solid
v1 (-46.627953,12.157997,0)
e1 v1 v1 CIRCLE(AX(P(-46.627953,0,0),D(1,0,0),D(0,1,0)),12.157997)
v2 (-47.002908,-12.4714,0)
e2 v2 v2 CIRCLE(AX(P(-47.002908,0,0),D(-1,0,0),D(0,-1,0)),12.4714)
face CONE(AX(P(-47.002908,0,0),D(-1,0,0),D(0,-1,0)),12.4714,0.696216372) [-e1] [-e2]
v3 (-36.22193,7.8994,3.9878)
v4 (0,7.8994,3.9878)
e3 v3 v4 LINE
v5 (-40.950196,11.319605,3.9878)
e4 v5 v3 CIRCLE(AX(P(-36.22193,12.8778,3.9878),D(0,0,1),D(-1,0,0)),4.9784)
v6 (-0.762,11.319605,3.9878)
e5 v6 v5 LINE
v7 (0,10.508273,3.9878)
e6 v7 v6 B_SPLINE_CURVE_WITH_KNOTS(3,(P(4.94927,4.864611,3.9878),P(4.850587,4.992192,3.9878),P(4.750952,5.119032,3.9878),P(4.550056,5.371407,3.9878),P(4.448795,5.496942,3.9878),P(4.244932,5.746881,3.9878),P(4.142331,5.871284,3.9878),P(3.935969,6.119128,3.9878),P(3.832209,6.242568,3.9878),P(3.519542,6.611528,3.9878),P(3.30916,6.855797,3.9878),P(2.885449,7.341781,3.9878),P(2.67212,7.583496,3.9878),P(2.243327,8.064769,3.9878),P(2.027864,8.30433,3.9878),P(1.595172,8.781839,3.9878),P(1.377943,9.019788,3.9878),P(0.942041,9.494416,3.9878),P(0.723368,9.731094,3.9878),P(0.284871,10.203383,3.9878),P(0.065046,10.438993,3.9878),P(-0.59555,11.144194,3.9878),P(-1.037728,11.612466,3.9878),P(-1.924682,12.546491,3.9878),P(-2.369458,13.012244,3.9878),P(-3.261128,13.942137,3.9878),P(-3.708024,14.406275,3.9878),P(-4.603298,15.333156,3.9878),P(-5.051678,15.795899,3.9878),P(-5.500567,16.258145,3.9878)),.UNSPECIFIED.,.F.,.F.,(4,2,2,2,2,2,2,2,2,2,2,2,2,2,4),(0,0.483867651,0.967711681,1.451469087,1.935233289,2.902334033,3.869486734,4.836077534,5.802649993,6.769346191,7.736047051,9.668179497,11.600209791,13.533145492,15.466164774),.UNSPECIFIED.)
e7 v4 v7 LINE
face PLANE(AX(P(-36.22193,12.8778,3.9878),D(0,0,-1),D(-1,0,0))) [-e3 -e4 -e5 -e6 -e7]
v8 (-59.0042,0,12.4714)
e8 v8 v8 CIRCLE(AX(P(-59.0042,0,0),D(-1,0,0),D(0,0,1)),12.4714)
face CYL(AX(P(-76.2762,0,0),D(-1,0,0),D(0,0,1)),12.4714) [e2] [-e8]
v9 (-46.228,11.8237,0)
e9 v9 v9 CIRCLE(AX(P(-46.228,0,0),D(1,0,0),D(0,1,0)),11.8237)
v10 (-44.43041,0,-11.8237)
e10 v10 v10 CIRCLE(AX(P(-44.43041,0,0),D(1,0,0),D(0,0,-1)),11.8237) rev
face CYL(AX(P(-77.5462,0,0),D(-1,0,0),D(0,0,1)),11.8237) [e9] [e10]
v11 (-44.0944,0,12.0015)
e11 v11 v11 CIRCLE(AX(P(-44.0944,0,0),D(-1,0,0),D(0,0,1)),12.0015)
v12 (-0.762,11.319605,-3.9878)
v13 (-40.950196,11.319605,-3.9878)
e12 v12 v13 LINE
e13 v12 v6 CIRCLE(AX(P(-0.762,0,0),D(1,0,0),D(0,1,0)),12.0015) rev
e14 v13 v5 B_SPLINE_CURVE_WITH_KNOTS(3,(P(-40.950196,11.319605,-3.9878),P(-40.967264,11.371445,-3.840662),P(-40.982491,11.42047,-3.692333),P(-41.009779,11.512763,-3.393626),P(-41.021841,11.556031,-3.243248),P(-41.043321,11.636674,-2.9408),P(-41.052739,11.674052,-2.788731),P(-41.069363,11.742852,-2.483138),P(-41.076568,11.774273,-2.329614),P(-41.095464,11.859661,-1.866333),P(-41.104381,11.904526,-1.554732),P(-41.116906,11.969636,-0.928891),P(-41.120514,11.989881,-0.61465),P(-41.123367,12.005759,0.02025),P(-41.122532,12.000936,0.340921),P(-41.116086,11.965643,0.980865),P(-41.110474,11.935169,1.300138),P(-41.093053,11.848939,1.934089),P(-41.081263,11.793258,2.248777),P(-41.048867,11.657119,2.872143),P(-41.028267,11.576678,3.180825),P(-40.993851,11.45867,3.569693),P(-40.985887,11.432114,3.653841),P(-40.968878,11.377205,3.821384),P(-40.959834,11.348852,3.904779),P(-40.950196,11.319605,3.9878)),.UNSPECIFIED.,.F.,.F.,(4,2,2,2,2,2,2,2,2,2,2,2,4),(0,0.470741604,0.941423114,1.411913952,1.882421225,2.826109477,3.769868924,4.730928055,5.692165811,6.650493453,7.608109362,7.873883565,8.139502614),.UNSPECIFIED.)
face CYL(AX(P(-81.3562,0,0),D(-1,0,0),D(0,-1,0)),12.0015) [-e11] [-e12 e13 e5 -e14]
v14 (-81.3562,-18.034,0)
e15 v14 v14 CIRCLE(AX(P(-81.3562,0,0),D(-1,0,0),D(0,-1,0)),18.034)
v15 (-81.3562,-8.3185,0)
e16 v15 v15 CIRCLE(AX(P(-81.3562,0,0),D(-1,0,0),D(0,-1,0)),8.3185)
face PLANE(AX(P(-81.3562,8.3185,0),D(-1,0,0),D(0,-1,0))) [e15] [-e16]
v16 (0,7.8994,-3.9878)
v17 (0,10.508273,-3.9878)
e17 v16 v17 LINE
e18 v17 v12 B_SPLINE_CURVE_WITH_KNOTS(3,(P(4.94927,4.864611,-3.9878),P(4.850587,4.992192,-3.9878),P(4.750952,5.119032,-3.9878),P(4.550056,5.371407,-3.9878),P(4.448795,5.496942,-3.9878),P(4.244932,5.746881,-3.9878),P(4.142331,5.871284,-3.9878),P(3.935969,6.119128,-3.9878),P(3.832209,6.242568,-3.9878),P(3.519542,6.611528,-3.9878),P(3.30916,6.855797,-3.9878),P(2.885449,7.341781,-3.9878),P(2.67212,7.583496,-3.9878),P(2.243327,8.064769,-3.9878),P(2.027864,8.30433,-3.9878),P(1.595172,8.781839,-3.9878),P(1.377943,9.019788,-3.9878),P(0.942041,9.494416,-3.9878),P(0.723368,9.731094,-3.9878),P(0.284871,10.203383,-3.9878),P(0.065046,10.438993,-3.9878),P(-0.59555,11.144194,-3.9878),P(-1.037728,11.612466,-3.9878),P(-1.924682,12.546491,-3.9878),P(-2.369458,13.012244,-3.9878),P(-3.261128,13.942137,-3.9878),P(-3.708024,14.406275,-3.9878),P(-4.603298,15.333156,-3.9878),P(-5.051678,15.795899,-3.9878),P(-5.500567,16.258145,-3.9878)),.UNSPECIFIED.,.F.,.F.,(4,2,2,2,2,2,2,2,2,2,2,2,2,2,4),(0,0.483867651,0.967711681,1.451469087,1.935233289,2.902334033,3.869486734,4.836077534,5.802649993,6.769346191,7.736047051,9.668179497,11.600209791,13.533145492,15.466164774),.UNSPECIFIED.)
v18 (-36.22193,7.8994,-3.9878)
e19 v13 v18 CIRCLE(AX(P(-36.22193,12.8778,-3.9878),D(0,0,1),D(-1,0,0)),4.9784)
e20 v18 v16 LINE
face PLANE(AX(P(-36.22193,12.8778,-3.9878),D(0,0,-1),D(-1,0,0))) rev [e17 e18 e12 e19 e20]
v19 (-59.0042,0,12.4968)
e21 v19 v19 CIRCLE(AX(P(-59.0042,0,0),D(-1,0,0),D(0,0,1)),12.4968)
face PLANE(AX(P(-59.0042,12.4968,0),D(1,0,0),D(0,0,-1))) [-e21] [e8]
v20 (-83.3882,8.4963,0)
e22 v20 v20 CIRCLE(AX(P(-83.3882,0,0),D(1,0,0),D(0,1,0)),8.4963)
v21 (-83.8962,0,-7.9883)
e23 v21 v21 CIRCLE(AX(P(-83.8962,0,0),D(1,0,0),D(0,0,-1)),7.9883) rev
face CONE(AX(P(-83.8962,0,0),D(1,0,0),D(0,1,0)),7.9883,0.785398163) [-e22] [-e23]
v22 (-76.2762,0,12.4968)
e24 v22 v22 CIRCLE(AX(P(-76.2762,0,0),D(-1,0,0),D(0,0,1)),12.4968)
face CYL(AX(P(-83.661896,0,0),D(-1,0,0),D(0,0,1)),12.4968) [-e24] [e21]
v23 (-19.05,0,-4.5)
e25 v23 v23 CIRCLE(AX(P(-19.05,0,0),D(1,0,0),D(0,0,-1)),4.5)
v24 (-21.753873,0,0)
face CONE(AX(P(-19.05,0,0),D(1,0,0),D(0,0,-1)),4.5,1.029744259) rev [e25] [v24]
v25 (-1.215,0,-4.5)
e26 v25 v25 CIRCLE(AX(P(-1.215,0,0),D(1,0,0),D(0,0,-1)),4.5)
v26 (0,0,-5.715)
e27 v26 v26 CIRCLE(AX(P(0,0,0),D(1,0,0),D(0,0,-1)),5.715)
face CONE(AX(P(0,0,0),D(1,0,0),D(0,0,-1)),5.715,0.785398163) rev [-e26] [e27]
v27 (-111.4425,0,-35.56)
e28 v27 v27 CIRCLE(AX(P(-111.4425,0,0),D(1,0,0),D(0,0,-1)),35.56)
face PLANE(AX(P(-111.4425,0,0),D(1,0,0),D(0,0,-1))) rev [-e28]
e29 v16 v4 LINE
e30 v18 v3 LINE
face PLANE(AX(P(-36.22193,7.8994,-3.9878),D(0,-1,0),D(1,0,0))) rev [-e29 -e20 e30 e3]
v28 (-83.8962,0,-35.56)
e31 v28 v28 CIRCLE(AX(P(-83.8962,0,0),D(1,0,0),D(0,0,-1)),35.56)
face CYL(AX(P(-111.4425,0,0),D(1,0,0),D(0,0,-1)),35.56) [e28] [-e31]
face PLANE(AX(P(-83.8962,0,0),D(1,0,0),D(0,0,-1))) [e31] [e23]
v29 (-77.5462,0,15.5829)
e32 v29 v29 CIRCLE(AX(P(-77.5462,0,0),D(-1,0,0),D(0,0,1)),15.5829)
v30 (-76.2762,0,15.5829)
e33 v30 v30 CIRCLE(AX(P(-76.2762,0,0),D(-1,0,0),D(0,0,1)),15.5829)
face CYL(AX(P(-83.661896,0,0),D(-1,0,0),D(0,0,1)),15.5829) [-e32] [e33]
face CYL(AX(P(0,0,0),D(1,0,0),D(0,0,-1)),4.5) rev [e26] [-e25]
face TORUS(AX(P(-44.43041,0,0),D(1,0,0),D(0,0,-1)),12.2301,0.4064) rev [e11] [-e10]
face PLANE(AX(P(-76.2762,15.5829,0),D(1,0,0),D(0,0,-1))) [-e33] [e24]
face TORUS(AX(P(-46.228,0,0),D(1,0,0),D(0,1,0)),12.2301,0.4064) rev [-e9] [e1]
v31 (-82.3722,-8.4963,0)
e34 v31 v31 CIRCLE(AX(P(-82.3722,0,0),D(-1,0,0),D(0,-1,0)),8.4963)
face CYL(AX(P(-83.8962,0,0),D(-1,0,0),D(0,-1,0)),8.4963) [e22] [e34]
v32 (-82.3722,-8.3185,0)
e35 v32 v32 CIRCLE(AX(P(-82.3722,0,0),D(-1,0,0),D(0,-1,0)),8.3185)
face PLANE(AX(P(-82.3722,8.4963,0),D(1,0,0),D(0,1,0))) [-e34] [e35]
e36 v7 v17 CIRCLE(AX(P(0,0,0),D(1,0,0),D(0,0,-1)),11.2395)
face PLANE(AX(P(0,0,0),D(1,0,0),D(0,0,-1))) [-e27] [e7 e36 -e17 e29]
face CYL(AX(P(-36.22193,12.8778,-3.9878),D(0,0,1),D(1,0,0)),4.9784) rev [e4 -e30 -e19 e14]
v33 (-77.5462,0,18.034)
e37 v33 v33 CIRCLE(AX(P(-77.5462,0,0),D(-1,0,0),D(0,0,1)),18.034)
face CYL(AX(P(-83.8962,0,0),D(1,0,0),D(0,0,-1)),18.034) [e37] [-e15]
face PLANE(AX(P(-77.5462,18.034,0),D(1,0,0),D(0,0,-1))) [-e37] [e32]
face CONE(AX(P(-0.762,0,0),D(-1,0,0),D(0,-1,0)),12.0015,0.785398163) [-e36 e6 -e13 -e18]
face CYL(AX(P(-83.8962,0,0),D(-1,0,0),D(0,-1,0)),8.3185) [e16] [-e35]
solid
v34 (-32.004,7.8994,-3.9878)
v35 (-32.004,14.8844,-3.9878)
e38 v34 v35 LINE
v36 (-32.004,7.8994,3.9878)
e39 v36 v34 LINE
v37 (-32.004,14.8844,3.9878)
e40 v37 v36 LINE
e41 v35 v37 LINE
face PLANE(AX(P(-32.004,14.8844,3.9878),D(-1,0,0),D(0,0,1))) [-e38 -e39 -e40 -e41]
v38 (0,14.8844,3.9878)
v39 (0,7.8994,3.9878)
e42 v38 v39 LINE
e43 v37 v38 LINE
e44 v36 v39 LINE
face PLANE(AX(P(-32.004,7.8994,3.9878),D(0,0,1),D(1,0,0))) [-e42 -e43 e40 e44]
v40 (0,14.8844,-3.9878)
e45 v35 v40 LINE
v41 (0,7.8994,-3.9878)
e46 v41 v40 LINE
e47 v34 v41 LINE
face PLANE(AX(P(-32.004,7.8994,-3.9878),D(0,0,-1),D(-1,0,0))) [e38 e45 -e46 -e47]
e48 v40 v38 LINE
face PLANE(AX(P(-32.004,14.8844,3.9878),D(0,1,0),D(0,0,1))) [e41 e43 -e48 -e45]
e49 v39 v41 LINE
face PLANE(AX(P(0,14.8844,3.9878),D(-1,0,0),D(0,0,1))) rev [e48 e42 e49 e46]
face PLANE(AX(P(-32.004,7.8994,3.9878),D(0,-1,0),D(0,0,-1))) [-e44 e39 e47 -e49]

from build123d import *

# Parameters (mm, degrees)
SKETCH2_R                                           = 18.034
EXTRUDE1_DEPTH                                      = 83.8962
SKETCH5_W                                           = 59.0042
SKETCH5_H                                           = 0.0254
SKETCH12_W                                          = 46.6344
SKETCH12_H                                          = 0.4699
SKETCH13_W                                          = 2.54
SKETCH13_H                                          = 0.1778
CSK_FOR_M8_COUNTERSUNK_FLAT_HEAD_SCREW1_D           = 9
CSK_FOR_M8_COUNTERSUNK_FLAT_HEAD_SCREW1_DEPTH       = 19.05
CSK_FOR_M8_COUNTERSUNK_FLAT_HEAD_SCREW1_CSINK_D     = 11.43
CSK_FOR_M8_COUNTERSUNK_FLAT_HEAD_SCREW1_CSINK_ANGLE = 90
CSK_FOR_M8_COUNTERSUNK_FLAT_HEAD_SCREW1_TIP         = 2.703872786
CHAMFER3_SIZE                                       = 0.762
FILLET1_R                                           = 0.4064
EXTRUDE2_DEPTH                                      = 3.9878
SKETCH9_W                                           = 7.9756
SKETCH9_H                                           = 6.985
EXTRUDE3_DEPTH                                      = 32.004
CHAMFER1_SIZE                                       = 0.508
SKETCH10_R                                          = 35.56
EXTRUDE4_DEPTH                                      = 27.5463


with BuildPart() as part:
    # Sketch2 → Extrude1 (new body)
    with BuildSketch(Plane(origin=(0, 0, 0), x_dir=(0, 0, -1), z_dir=(1, 0, 0))):
        Circle(SKETCH2_R)
    extrude(amount=-EXTRUDE1_DEPTH)

    # Sketch3 → Cut-Revolve1 (revolve, cut)
    with BuildSketch(Plane.XY, mode=Mode.PRIVATE) as cut_revolve1_sk:
        Polygon((-83.8962, 8.4963), (-82.3722, 8.4963), (-82.3722, 8.3185), (-81.3562, 8.3185), (-81.3562, 18.034), (-83.8962, 18.034), align=None)
    revolve(cut_revolve1_sk.sketch.rotate(Axis((-83.8962, 0, 0), (1, 0, 0)), 180), axis=Axis((-83.8962, 0, 0), (1, 0, 0)), mode=Mode.SUBTRACT)

    # Sketch4 → Cut-Revolve2 (revolve, cut)
    with BuildSketch(Plane.XY, mode=Mode.PRIVATE) as cut_revolve2_sk:
        Polygon((-77.5462, 18.034), (-77.5462, 15.5829), (-76.2762, 15.5829), (-76.2762, 12.4968), (0, 12.4968), (0, 18.034), align=None)
    revolve(cut_revolve2_sk.sketch.rotate(Axis((-83.661895901, 0, 0), (1, 0, 0)), 90), axis=Axis((-83.661895901, 0, 0), (1, 0, 0)), mode=Mode.SUBTRACT)

    # Sketch5 → Cut-Revolve3 (revolve, cut)
    with BuildSketch(Plane.XY, mode=Mode.PRIVATE) as cut_revolve3_sk:
        with Locations((-29.5021, 12.4841)):
            Rectangle(SKETCH5_W, SKETCH5_H)
    revolve(cut_revolve3_sk.sketch.rotate(Axis((-76.2762, 0, 0), (1, 0, 0)), 90), axis=Axis((-76.2762, 0, 0), (1, 0, 0)), mode=Mode.SUBTRACT)

    # Sketch12 → Cut-Revolve4 (revolve, cut)
    with BuildSketch(Plane.XY, mode=Mode.PRIVATE) as cut_revolve4_sk:
        with Locations((-23.3172, 12.23645)):
            Rectangle(SKETCH12_W, SKETCH12_H)
    revolve(cut_revolve4_sk.sketch.rotate(Axis((-81.3562, 0, 0), (1, 0, 0)), 180), axis=Axis((-81.3562, 0, 0), (1, 0, 0)), mode=Mode.SUBTRACT)

    # Sketch13 → Cut-Revolve5 (revolve, cut)
    with BuildSketch(Plane.XY, mode=Mode.PRIVATE) as cut_revolve5_sk:
        with Locations((-45.3644, 11.9126)):
            Rectangle(SKETCH13_W, SKETCH13_H)
    revolve(cut_revolve5_sk.sketch.rotate(Axis((-77.5462, 0, 0), (1, 0, 0)), 180), axis=Axis((-77.5462, 0, 0), (1, 0, 0)), mode=Mode.SUBTRACT)

    # CSK for M8 Countersunk Flat Head Screw1
    with Locations(Plane(origin=(0, 0, 0), x_dir=(0, 0, 1), z_dir=(1, 0, 0))):
        with Locations((0, 0)):
            CounterSinkHole(CSK_FOR_M8_COUNTERSUNK_FLAT_HEAD_SCREW1_D / 2, CSK_FOR_M8_COUNTERSUNK_FLAT_HEAD_SCREW1_CSINK_D / 2, depth=CSK_FOR_M8_COUNTERSUNK_FLAT_HEAD_SCREW1_DEPTH, counter_sink_angle=CSK_FOR_M8_COUNTERSUNK_FLAT_HEAD_SCREW1_CSINK_ANGLE)
            with Locations((0, 0, -(CSK_FOR_M8_COUNTERSUNK_FLAT_HEAD_SCREW1_DEPTH + CSK_FOR_M8_COUNTERSUNK_FLAT_HEAD_SCREW1_TIP / 2))):  # 118° drill point
                Cone(0, CSK_FOR_M8_COUNTERSUNK_FLAT_HEAD_SCREW1_D / 2, CSK_FOR_M8_COUNTERSUNK_FLAT_HEAD_SCREW1_TIP, mode=Mode.SUBTRACT)

    # Chamfer3
    chamfer3_edges = [part.edges().sort_by_distance(p)[0] for p in [
        (0, 12.0015, 0),
    ]]
    chamfer(chamfer3_edges, length=CHAMFER3_SIZE)

    # Fillet1
    # the kernel refuses this fillet: 0.4064 mm, written as the material it adds along each edge
    with BuildSketch(Plane(origin=(-46.6344, 0, 0), x_dir=(0, -1, 0), z_dir=(0, 0, 1))) as fillet1_piece_1:
        with BuildLine():
            CenterArc((11.8237 + FILLET1_R, FILLET1_R), FILLET1_R, 180, 90)
            Line((11.8237 + FILLET1_R, 0), (11.8237 + FILLET1_R, -FILLET1_R * 0.02))
            Line((11.8237 + FILLET1_R, -FILLET1_R * 0.02), (11.8237 - FILLET1_R * 0.02, -FILLET1_R * 0.02))
            Line((11.8237 - FILLET1_R * 0.02, -FILLET1_R * 0.02), (11.8237 - FILLET1_R * 0.02, FILLET1_R))
            Line((11.8237 - FILLET1_R * 0.02, FILLET1_R), (11.8237, FILLET1_R))
        make_face()
    revolve(axis=Axis((-46.6344, 0, 0), (1, 0, 0)))
    with BuildSketch(Plane(origin=(-44.0944, 0, 0), x_dir=(0, -1, 0), z_dir=(0, 0, 1))) as fillet1_piece_2:
        with BuildLine():
            CenterArc((12.2301, -0.336010417), FILLET1_R, 124.228866328, 55.771133672)
            Line((11.8237, -0.336010417), (11.815572, -0.336010417))
            Line((11.815572, -0.336010417), (11.815572, 0))
            Line((11.815572, 0), (11.8237, 0.008128))
            ThreePointArc((11.8237, 0.008128), (11.9126, 0.008128), (11.996928, 0.006720208))
            Line((11.996928, 0.006720208), (12.0015, 0))
        make_face()
    revolve(axis=Axis((-44.0944, 0, 0), (1, 0, 0)))

    # Sketch8 → Extrude2 (cut, symmetric)
    with BuildSketch(Plane.XY):
        with BuildLine():
            Line((-41.1226, 12.0015), (0, 12.0015))
            Line((0, 12.0015), (0, 7.8994))
            Line((0, 7.8994), (-36.221930161, 7.8994))
            ThreePointArc((-36.221930161, 7.8994), (-39.417387455, 9.060272104), (-41.1226, 12.0015))
        make_face()
    extrude(amount=EXTRUDE2_DEPTH, both=True, mode=Mode.SUBTRACT)

    # Chamfer1
    chamfer1_edges = [part.edges().sort_by_distance(p)[0] for p in [
        (-83.8962, 8.4963, 0),
    ]]
    chamfer(chamfer1_edges, length=CHAMFER1_SIZE)

    # Chamfer2: read off the stored shape, not the designer's step
    # Chamfer2 outline → Chamfer2 (revolve, cut)
    with BuildSketch(Plane.YX):
        Polygon((12.2301, -46.627952603), (12.157996774, -46.627952603), (12.4714, -47.002908169), (12.4714, -46.6344), (12.2301, -46.6344), align=None)
    revolve(axis=Axis((0, 0, 0), (1, 0, 0)), mode=Mode.SUBTRACT)

    # Sketch10 → Extrude4 (add)
    with BuildSketch(Plane(origin=(-83.8962, 0, 0), x_dir=(0, 0, -1), z_dir=(1, 0, 0))):
        Circle(SKETCH10_R)
    extrude(amount=-EXTRUDE4_DEPTH)


with BuildPart() as body_2:
    # Sketch9 → Extrude3 (new body)
    with BuildSketch(Plane(origin=(0, 0, 0), x_dir=(0, 0, -1), z_dir=(1, 0, 0))):
        with Locations((0, 11.3919)):
            Rectangle(SKETCH9_W, SKETCH9_H)
    extrude(amount=-EXTRUDE3_DEPTH)


solid = Compound([part.part, body_2.part])
